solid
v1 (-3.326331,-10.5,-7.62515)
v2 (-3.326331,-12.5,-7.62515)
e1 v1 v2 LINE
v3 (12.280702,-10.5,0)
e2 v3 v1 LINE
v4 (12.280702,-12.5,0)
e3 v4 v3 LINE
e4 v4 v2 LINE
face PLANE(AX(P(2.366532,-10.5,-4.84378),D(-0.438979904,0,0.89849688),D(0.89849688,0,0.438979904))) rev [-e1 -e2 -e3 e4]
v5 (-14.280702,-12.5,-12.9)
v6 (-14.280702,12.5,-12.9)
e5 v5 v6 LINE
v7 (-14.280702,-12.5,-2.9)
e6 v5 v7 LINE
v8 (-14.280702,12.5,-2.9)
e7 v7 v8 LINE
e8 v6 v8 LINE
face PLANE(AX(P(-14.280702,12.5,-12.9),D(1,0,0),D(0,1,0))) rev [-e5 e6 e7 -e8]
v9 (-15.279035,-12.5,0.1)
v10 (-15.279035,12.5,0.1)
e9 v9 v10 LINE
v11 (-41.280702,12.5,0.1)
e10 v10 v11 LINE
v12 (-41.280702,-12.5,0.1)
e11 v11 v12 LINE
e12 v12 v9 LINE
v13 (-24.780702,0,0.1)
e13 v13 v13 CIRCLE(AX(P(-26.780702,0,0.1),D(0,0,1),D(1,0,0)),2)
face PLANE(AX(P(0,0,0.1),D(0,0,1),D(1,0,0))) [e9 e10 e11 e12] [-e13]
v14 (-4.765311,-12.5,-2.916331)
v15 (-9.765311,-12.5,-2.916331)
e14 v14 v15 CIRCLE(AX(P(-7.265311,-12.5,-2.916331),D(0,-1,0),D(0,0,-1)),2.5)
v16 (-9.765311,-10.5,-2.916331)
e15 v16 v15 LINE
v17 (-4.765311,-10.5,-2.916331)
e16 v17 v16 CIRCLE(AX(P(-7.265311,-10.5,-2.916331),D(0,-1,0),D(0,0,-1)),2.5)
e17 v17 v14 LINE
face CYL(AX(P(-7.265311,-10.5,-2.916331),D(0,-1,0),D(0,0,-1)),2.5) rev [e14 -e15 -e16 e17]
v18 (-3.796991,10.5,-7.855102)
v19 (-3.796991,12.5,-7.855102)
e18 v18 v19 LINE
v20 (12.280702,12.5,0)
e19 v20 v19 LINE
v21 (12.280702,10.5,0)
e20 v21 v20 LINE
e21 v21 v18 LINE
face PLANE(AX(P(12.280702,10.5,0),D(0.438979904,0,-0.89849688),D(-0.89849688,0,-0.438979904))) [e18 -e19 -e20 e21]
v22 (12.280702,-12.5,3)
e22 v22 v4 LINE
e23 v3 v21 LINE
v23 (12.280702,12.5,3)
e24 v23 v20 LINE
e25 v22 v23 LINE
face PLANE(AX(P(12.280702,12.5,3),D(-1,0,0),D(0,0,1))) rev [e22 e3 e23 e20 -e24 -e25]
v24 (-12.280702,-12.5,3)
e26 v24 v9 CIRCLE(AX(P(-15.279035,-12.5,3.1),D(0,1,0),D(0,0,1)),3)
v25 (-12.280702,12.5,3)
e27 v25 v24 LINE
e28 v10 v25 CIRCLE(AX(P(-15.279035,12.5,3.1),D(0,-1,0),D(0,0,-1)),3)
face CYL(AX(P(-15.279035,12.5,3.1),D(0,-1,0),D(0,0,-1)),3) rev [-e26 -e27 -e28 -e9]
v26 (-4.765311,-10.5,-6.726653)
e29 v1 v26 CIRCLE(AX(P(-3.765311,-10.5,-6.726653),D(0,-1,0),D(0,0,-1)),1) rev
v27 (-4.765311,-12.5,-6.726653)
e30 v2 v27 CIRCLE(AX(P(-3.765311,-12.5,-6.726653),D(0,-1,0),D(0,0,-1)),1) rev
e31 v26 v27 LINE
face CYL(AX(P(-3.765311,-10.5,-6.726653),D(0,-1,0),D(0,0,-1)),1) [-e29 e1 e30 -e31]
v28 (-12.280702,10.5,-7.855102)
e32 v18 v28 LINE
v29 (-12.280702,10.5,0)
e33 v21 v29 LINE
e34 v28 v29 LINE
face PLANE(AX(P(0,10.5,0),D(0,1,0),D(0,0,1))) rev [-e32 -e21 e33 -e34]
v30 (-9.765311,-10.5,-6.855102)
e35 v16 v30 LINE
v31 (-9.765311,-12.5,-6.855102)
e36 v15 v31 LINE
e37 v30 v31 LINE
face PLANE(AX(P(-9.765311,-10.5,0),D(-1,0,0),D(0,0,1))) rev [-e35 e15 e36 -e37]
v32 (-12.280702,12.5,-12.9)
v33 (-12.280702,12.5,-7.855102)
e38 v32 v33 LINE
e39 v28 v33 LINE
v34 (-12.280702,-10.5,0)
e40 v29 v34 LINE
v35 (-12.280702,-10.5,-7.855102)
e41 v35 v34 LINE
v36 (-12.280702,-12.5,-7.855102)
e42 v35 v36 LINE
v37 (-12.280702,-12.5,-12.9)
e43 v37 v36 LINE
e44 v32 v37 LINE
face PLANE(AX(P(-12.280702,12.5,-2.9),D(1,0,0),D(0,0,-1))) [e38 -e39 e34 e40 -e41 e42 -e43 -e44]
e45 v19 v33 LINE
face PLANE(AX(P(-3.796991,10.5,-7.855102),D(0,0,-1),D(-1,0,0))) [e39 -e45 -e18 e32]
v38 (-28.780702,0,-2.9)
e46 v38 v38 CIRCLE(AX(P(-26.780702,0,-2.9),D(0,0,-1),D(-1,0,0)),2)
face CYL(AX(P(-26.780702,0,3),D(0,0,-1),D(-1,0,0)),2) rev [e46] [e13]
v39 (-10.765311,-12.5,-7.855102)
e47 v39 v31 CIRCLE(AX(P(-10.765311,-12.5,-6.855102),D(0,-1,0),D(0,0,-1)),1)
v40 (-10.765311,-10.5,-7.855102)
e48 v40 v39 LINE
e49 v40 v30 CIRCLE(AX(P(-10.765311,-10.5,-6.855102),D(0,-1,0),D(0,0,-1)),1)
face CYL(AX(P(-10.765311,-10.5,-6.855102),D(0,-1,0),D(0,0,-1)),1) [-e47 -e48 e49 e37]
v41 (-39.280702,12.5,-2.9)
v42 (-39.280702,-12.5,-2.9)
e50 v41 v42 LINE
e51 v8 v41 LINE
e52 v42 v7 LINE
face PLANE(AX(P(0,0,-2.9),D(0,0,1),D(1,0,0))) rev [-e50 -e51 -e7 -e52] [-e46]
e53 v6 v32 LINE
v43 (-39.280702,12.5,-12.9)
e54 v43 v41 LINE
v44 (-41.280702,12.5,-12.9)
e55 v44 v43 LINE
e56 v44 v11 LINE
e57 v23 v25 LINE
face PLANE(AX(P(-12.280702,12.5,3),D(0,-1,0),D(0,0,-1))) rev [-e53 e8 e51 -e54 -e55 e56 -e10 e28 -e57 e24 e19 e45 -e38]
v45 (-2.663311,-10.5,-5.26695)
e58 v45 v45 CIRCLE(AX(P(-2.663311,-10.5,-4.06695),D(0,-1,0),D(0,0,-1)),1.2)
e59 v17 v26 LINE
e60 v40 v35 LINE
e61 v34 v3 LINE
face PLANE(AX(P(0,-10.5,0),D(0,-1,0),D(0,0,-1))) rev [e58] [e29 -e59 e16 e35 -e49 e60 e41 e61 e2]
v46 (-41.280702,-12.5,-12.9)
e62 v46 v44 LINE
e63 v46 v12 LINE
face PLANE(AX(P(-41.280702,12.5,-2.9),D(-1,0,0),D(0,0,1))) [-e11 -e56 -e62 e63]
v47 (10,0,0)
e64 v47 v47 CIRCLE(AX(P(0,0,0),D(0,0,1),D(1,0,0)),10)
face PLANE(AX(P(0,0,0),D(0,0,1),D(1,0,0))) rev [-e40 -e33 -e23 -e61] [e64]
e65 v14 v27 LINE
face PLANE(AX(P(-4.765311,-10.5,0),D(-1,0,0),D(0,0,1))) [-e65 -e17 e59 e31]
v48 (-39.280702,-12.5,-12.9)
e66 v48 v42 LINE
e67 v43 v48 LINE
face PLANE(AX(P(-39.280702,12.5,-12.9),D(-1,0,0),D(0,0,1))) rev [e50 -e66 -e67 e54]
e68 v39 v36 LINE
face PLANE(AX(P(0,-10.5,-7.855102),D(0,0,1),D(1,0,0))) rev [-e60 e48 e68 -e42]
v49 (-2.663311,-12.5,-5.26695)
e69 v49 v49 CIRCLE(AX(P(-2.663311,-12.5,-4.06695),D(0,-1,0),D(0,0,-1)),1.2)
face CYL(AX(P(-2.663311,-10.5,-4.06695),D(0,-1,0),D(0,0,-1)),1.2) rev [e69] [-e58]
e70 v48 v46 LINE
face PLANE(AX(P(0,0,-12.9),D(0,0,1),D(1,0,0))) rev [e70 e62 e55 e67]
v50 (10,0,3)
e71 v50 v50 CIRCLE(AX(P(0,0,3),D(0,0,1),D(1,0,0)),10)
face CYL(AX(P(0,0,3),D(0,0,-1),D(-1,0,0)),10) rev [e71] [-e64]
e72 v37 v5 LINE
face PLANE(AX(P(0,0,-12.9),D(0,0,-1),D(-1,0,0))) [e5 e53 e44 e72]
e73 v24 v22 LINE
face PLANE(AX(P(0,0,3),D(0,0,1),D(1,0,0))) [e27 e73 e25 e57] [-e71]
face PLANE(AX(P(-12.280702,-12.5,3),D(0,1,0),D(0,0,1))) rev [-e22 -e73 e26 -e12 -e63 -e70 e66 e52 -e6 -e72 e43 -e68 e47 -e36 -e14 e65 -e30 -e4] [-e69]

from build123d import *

# Parameters (mm, degrees)
SKETCH_1_W          = 24.561403508
SKETCH_1_H          = 25
SKETCH_1_R          = 10
EXTRUDE_1_DEPTH     = 3
EXTRUDE_START       = -2.9
SKETCH_2_W          = 29
SKETCH_2_H          = 25
EXTRUDE_2_DEPTH     = 3
SKETCH_4_W          = 2
SKETCH_4_H          = 25
EXTRUDE_3_DEPTH     = 10
EXTRUDE_4_DEPTH     = 2
SKETCH_6_R          = 1.2
EXTRUDE_5_DEPTH     = 2
SKETCH_7_R          = 2
CUT_EXTRUDE_1_DEPTH = 45.275798551
FILLET_1_R          = 3


with BuildPart() as part:
    # Эскиз1 → Бобышка-Вытянуть1 (new body)
    with BuildSketch(Plane.XY):
        Rectangle(SKETCH_1_W, SKETCH_1_H)
        Circle(SKETCH_1_R, mode=Mode.SUBTRACT)
    extrude(amount=EXTRUDE_1_DEPTH)

    # Эскиз2 → Бобышка-Вытянуть2 (add)
    with BuildSketch(Plane.XY.offset(3).offset(EXTRUDE_START)):
        with Locations((-26.780701754, 0)):
            Rectangle(SKETCH_2_W, SKETCH_2_H)
    extrude(amount=-EXTRUDE_2_DEPTH)

    # Эскиз4 → Бобышка-Вытянуть3 (add)
    with BuildSketch(Plane(origin=(0, 0, -2.9), x_dir=(-1, 0, 0), z_dir=(0, 0, -1))):
        with Locations((13.280701754, 0)):
            Rectangle(SKETCH_4_W, SKETCH_4_H)
        with Locations((40.280701754, 0)):
            Rectangle(SKETCH_4_W, SKETCH_4_H)
    extrude(amount=EXTRUDE_3_DEPTH)

    # Эскиз5 → Бобышка-Вытянуть4 (add)
    with BuildSketch(Plane(origin=(0, 12.5, 0), x_dir=(1, 0, 0), z_dir=(0, 1, 0))):
        Polygon((-14.280701754, 7.855101529), (-14.280701754, -0.1), (-12.280701754, -0.1), (-12.280701754, -3), (12.280701754, -3), (12.280701754, 0), (-3.796991433, 7.855101529), align=None)
    extrude(amount=-EXTRUDE_4_DEPTH)

    # Эскиз6 → Бобышка-Вытянуть5 (add)
    with BuildSketch(Plane.XZ.offset(12.5)):
        with BuildLine():
            Line((-12.280701754, 0), (-12.280701754, -7.855101529))
            Line((-12.280701754, -7.855101529), (-10.765310979, -7.855101529))
            ThreePointArc((-10.765310979, -7.855101529), (-10.058204198, -7.56220831), (-9.765310979, -6.855101529))
            Line((-9.765310979, -6.855101529), (-9.765310979, -2.916331119))
            ThreePointArc((-9.765310979, -2.916331119), (-7.265310979, -0.416331119), (-4.765310979, -2.916331119))
            Line((-4.765310979, -2.916331119), (-4.765310979, -6.726653445))
            ThreePointArc((-4.765310979, -6.726653445), (-4.294942972, -7.574880981), (-3.326331075, -7.625150325))
            Line((-3.326331075, -7.625150325), (12.280701754, 0))
            Line((12.280701754, 0), (-12.280701754, 0))
        make_face()
        with Locations(Location((-2.663311188, -4.066950409, 0), (0, 0, 270))):
            Circle(SKETCH_6_R, mode=Mode.SUBTRACT)
    extrude(amount=-EXTRUDE_5_DEPTH)

    # Эскиз7 → Вырез-Вытянуть1 (cut, through all)
    with BuildSketch(Plane(origin=(0, 0, -2.9), x_dir=(-1, 0, 0), z_dir=(0, 0, -1))):
        with Locations((26.780701754, 0)):
            Circle(SKETCH_7_R)
    extrude(amount=-CUT_EXTRUDE_1_DEPTH, mode=Mode.SUBTRACT)

    # Скругление1
    # the kernel refuses this fillet: 3 mm, written as the material it adds along each edge
    with BuildSketch(Plane(origin=(-12.280701754, -12.5, 0.1), x_dir=(0, 0, 1), z_dir=(0, 1, 0))) as fillet_1_piece_1:
        with BuildLine():
            CenterArc((3, -2.99833287), FILLET_1_R, 91.910213172, 88.089786828)
            Line((0, -2.99833287), (-0.06, -2.99833287))
            Line((-0.06, -2.99833287), (-0.06, 0))
            Line((-0.06, 0), (0, 0.06))
            ThreePointArc((0, 0.06), (1.45, 0.06), (2.898, 0.059966657))
            Line((2.898, 0.059966657), (2.9, 0))
        make_face()
    extrude(amount=25)


solid = part.part
